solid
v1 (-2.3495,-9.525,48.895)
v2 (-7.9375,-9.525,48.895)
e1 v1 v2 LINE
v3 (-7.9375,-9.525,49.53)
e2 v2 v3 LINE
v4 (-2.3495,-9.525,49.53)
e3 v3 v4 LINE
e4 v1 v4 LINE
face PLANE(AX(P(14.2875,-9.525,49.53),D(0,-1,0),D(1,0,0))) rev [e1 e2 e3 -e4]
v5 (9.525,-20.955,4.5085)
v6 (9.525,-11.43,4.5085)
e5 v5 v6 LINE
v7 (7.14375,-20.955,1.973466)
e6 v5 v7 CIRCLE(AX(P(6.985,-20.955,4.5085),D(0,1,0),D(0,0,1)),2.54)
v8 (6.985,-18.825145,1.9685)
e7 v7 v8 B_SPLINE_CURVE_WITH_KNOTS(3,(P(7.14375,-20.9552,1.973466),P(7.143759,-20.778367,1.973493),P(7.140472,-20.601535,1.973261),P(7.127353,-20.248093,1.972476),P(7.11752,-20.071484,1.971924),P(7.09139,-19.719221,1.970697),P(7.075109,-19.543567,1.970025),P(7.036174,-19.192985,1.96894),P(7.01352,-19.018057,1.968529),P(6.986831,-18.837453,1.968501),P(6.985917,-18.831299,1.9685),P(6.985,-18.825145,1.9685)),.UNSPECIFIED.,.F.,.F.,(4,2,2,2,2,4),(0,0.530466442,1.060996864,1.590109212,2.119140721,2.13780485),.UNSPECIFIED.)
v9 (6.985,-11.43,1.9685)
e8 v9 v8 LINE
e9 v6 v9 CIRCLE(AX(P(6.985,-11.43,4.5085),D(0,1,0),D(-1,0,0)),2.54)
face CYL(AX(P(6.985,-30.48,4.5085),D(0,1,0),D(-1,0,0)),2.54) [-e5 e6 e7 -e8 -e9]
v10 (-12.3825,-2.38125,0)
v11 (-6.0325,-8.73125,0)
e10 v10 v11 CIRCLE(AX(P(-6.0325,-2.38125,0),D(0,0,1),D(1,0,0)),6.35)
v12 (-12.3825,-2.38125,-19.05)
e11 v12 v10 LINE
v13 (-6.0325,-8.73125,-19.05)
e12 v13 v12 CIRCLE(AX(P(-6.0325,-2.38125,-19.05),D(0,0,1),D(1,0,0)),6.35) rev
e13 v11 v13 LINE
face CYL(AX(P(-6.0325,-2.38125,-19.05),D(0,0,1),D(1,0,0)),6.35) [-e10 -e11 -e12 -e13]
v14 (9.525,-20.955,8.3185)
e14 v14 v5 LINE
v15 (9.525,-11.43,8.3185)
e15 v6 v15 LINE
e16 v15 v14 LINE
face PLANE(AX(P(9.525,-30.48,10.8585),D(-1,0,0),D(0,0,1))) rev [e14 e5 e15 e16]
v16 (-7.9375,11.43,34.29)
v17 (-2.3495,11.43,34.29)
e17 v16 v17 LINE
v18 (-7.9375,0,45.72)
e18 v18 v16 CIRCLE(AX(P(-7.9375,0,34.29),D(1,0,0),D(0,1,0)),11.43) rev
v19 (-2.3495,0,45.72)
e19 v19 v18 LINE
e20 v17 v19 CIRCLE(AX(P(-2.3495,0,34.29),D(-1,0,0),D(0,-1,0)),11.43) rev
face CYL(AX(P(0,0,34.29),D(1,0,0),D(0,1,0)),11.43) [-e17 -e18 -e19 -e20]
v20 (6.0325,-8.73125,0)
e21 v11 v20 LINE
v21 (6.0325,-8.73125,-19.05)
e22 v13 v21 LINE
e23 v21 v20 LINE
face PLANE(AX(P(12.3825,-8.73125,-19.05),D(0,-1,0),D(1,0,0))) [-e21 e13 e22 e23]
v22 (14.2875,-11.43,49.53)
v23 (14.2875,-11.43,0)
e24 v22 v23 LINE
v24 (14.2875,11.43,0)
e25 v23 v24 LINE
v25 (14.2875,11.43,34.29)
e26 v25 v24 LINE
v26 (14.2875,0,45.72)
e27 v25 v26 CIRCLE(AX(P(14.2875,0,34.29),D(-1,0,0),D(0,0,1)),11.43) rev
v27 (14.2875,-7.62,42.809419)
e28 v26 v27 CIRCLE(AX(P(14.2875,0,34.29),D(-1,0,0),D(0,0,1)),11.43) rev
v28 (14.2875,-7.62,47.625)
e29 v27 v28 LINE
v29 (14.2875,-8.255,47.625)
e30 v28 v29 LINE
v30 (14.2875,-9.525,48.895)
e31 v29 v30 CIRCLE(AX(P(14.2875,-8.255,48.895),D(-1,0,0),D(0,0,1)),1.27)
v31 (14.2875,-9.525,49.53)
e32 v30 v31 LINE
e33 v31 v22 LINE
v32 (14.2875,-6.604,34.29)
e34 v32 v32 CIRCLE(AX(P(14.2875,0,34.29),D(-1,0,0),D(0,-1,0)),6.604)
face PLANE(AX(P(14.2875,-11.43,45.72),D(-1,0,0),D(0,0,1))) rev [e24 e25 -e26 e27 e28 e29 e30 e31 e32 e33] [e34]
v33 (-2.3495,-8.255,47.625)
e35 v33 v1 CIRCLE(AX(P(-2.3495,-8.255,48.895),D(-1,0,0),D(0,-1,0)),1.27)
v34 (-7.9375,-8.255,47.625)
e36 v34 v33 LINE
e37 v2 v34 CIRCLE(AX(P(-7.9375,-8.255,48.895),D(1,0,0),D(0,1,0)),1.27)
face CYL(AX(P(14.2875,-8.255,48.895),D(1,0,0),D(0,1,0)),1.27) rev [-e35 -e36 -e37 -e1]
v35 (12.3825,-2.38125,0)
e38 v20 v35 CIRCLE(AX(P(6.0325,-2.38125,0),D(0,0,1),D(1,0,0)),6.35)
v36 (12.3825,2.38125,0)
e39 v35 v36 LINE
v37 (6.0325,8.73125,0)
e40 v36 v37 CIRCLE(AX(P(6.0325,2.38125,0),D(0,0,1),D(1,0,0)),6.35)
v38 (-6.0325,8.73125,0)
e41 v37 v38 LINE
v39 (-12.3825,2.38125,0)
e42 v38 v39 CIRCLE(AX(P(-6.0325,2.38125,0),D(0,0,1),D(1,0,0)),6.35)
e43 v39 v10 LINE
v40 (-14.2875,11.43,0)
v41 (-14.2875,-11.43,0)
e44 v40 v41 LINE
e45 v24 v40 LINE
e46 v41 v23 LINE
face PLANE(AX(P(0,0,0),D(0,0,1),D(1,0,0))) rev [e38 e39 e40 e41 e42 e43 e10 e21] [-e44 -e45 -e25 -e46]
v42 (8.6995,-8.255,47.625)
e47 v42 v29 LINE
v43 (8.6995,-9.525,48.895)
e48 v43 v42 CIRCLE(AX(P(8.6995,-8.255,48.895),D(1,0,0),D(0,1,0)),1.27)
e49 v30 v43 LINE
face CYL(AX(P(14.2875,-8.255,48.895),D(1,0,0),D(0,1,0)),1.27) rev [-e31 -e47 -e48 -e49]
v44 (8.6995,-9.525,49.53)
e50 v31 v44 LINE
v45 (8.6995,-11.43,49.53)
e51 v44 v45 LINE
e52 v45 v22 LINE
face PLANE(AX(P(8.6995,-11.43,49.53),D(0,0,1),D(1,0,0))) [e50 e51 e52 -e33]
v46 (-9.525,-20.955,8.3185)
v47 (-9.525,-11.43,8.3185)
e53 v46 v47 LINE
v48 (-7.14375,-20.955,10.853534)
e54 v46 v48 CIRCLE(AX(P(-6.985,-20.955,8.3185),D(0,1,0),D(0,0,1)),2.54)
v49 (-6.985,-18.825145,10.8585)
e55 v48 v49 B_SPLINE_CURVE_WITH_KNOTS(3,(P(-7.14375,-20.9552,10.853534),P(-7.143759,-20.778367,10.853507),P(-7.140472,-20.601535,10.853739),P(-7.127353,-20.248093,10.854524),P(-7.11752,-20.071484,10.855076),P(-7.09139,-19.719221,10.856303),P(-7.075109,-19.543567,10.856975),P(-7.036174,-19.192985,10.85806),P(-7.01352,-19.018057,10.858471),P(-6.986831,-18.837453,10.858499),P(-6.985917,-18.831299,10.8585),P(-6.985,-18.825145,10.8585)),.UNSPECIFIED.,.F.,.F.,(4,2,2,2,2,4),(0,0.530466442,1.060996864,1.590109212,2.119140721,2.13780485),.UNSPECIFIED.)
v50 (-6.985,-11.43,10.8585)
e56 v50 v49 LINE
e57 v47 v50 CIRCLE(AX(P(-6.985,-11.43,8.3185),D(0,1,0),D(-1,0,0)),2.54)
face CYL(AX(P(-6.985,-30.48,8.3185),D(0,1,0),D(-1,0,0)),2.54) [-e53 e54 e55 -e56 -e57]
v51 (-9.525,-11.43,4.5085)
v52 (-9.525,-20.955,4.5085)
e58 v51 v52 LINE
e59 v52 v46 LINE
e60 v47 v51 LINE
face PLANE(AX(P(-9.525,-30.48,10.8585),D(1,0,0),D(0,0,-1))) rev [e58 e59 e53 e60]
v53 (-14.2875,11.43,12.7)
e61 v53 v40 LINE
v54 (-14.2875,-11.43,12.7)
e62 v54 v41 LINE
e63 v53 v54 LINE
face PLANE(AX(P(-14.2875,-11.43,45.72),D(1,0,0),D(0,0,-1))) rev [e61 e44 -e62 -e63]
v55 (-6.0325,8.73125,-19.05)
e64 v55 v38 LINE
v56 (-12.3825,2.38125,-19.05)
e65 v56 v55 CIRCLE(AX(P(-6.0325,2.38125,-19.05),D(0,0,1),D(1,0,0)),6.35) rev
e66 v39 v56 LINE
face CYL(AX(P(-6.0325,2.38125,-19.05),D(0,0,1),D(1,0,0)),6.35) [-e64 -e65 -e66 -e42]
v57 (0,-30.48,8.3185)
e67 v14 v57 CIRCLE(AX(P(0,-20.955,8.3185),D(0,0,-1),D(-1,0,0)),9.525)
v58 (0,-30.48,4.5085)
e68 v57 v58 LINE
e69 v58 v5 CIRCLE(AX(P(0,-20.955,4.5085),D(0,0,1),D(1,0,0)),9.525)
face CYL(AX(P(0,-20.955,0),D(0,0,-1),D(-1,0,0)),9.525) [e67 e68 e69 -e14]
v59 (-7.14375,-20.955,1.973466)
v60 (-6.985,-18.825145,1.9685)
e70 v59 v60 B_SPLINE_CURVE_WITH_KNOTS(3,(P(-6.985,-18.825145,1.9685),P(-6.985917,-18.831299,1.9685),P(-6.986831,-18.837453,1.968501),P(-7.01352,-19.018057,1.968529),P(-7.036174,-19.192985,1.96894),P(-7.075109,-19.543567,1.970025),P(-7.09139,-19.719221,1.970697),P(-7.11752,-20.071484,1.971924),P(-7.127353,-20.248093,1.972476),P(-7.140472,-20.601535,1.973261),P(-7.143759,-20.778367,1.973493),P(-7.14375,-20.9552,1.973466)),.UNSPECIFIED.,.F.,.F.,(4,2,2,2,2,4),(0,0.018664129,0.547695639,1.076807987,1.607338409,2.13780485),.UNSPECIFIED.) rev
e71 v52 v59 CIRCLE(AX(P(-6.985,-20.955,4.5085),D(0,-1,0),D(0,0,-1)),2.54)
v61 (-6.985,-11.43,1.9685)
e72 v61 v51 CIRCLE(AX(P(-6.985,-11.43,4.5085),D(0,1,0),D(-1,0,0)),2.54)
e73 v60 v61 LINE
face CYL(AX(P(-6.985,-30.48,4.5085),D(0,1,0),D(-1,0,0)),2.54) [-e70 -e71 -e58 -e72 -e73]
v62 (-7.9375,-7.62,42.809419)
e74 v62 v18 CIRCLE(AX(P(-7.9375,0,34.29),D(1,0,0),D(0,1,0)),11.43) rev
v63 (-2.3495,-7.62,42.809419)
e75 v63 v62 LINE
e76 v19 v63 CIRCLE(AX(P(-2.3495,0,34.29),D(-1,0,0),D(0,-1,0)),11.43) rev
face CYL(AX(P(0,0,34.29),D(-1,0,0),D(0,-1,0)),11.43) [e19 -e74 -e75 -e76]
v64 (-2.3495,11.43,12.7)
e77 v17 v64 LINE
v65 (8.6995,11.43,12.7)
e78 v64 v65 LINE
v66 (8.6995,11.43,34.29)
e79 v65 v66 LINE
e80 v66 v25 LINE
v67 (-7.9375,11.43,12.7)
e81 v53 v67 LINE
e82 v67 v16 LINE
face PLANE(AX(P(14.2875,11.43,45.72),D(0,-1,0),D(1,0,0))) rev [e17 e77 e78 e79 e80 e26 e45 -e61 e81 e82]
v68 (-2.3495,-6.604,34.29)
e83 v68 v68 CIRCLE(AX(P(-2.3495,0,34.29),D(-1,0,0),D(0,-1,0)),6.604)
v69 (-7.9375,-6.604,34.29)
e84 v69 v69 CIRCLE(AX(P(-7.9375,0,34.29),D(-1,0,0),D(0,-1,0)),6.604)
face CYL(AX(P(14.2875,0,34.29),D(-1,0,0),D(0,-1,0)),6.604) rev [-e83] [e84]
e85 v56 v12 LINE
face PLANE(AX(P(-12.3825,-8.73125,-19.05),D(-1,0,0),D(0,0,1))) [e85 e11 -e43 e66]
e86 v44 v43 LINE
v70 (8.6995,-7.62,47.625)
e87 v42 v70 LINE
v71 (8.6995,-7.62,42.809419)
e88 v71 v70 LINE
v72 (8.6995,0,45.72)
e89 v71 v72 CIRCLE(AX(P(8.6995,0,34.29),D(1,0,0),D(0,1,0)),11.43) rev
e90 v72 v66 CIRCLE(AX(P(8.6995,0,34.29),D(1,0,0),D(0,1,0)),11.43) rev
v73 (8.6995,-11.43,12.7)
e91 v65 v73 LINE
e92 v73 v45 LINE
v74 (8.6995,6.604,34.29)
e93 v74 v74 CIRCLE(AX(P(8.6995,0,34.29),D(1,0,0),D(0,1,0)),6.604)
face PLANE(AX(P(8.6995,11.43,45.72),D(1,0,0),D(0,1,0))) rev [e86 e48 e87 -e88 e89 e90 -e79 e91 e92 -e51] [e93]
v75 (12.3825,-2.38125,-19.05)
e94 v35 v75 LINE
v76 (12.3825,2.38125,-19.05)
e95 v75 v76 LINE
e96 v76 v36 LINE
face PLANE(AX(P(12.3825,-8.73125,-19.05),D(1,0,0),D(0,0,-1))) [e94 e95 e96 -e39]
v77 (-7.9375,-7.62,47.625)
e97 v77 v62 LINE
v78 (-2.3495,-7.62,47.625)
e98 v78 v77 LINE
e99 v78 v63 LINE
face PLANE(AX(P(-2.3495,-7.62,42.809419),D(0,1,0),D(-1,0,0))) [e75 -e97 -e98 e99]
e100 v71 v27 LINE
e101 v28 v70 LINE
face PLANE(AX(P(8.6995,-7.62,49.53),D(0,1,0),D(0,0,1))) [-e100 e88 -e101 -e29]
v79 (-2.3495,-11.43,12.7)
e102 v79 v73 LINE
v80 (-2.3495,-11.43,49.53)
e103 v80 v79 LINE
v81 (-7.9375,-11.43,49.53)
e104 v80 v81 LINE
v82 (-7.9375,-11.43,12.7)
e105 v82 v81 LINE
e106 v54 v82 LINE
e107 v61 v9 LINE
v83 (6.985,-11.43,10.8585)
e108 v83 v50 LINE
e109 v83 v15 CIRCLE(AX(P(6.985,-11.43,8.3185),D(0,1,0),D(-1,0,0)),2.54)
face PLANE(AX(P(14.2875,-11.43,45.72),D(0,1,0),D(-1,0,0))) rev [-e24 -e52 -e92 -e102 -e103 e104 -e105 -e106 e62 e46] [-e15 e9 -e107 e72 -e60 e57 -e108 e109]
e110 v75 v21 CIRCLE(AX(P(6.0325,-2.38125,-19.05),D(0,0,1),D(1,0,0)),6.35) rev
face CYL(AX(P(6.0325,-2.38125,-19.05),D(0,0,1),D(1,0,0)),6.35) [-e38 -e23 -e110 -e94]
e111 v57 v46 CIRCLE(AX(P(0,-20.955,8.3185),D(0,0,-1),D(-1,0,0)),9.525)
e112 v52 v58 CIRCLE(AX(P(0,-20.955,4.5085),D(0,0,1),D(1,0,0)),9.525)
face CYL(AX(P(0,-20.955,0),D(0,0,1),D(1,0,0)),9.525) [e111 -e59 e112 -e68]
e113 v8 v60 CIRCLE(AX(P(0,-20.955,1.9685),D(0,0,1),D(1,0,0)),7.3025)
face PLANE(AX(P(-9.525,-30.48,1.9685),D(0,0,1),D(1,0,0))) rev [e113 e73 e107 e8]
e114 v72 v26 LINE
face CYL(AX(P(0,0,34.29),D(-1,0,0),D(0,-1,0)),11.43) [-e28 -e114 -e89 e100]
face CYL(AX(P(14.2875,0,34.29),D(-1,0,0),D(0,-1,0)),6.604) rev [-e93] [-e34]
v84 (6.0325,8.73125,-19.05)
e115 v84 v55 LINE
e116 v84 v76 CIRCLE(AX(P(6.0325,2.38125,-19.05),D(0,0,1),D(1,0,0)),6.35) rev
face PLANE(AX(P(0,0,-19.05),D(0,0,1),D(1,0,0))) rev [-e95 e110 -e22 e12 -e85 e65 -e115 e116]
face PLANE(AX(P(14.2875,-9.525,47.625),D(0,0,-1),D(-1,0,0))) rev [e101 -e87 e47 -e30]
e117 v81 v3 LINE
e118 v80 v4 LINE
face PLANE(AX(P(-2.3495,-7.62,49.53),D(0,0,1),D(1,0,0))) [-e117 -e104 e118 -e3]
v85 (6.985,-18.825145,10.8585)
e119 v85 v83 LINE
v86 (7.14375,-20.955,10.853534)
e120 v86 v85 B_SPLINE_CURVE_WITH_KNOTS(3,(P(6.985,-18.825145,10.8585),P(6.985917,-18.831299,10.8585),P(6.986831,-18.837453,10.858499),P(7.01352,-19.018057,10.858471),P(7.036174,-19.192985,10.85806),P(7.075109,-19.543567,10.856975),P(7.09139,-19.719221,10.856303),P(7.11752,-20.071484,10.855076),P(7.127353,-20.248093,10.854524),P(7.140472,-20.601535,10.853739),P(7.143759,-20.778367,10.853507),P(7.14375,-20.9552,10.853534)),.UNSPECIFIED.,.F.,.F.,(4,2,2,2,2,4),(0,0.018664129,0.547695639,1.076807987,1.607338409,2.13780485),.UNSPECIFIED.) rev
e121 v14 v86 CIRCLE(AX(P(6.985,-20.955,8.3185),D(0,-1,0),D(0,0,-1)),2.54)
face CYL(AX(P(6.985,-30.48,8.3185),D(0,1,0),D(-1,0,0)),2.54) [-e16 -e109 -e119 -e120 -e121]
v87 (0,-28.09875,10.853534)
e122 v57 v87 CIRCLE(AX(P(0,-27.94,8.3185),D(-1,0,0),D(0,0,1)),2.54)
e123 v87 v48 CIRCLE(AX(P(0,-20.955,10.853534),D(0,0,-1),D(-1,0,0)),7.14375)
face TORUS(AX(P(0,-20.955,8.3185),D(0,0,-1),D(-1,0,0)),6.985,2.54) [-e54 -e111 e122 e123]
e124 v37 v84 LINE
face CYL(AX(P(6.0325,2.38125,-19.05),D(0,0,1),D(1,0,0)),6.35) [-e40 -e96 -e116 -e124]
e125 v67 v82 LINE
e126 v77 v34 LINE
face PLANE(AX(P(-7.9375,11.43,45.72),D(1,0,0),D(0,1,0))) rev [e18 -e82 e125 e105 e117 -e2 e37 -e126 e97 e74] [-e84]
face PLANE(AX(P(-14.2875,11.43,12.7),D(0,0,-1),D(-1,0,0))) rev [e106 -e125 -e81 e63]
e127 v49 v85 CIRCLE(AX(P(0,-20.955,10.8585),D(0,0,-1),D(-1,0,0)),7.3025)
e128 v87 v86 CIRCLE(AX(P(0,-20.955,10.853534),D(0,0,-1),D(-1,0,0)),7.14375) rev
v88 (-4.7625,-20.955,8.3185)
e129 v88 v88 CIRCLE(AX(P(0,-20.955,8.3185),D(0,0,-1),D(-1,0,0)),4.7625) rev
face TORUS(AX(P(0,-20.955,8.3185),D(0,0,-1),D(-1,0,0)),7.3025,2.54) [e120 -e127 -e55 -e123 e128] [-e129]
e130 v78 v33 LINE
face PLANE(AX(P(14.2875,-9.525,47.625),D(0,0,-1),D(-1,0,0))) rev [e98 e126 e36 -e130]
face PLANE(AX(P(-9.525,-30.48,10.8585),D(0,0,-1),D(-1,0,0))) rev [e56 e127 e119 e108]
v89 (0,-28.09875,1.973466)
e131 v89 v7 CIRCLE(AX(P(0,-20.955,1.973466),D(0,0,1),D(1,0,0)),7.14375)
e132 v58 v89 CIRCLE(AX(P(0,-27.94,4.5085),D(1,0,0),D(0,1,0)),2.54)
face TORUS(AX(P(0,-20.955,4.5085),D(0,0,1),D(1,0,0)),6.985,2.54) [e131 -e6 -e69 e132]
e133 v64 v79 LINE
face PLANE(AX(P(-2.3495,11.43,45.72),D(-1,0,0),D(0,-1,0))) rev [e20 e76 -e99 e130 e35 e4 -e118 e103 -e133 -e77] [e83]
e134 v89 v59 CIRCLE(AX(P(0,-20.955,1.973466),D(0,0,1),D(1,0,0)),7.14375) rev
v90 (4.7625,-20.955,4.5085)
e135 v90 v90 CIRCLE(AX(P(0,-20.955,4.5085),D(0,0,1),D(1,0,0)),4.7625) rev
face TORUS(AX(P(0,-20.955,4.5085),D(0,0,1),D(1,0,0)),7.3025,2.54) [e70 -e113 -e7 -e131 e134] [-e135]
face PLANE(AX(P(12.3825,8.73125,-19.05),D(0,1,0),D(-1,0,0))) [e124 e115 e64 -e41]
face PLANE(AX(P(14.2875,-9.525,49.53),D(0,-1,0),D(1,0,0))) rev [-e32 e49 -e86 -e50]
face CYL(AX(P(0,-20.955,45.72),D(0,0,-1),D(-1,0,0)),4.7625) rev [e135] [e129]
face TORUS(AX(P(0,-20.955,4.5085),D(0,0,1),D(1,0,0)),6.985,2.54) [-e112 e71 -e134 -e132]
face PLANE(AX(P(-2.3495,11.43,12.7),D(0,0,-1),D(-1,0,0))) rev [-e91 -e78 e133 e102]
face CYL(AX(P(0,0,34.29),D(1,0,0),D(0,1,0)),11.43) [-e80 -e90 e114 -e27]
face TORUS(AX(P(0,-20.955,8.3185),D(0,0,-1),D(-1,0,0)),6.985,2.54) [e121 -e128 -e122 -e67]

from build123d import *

# Parameters (mm, degrees)
SKETCH2_W           = 24.765
SKETCH2_H           = 17.4625
BOSS_EXTRUDE1_DEPTH = 19.05
SKETCH3_W           = 28.575
SKETCH3_H           = 22.86
BOSS_EXTRUDE2_DEPTH = 45.72
SKETCH4_W           = 6.35
SKETCH4_H           = 33.02
SKETCH4_W_2         = 11.049
CUT_EXTRUDE1_DEPTH  = 54.075706837
SKETCH5_W           = 19.05
SKETCH5_H           = 8.89
BOSS_EXTRUDE3_DEPTH = 19.05
FILLET1_R           = 9.525
SKETCH6_R           = 4.7625
CUT_EXTRUDE2_DEPTH  = 56.202869568
FILLET5_R           = 11.43
SKETCH7_R           = 6.604
CUT_EXTRUDE3_DEPTH  = 60.273091914
FILLET2_R           = 2.54
FILLET3_R           = 6.35
BOSS_EXTRUDE5_DEPTH = 5.588
BOSS_EXTRUDE6_DEPTH = 5.588
SKETCH17_W          = 1.905
SKETCH17_H          = 1.905
CUT_EXTRUDE9_DEPTH  = 63.259151384
FILLET6_R           = 1.27


# Some blends are built 0.0001 mm under size
with BuildPart() as part:
    # Sketch2 → Boss-Extrude1 (new body)
    with BuildSketch(Plane.XY):
        Rectangle(SKETCH2_W, SKETCH2_H)
    extrude(amount=-BOSS_EXTRUDE1_DEPTH)

    # Sketch3 → Boss-Extrude2 (add)
    with BuildSketch(Plane.XY):
        Rectangle(SKETCH3_W, SKETCH3_H)
    extrude(amount=BOSS_EXTRUDE2_DEPTH)

    # Sketch4 → Cut-Extrude1 (cut, through all)
    with BuildSketch(Plane(origin=(0, -11.43, 0), x_dir=(-1, 0, 0), z_dir=(0, -1, 0))):
        with Locations((11.1125, -29.21)):
            Rectangle(SKETCH4_W, SKETCH4_H)
        with Locations((-3.175, -29.21)):
            Rectangle(SKETCH4_W_2, SKETCH4_H)
    extrude(amount=-CUT_EXTRUDE1_DEPTH, mode=Mode.SUBTRACT)

    # Sketch5 → Boss-Extrude3 (add)
    with BuildSketch(Plane.XZ.offset(11.43)):
        with Locations((0, 6.4135)):
            Rectangle(SKETCH5_W, SKETCH5_H)
    extrude(amount=BOSS_EXTRUDE3_DEPTH)

    # Fillet1
    fillet1_edges = [part.edges().sort_by_distance(p)[0] for p in [
        (9.525, -30.48, 6.4135),
        (-9.525, -30.48, 6.4135),
    ]]
    fillet(fillet1_edges, radius=FILLET1_R - 0.0001)  # a hair under: the kernel refuses the full size

    # Sketch6 → Cut-Extrude2 (cut, through all)
    with BuildSketch(Plane(origin=(0, 0, 1.9685), x_dir=(-1, 0, 0), z_dir=(0, 0, -1))):
        with Locations((0, -20.955)):
            Circle(SKETCH6_R)
    extrude(amount=-CUT_EXTRUDE2_DEPTH, mode=Mode.SUBTRACT)

    # Fillet5
    fillet5_edges = [part.edges().sort_by_distance(p)[0] for p in [
        (-5.1435, -11.43, 45.72),
        (-5.1435, 11.43, 45.72),
        (11.4935, 11.43, 45.72),
        (11.4935, -11.43, 45.72),
    ]]
    fillet(fillet5_edges, radius=FILLET5_R - 0.0001)  # a hair under: the kernel refuses the full size

    # Sketch7 → Cut-Extrude3 (cut, through all)
    with BuildSketch(Plane.ZY.offset(7.9375)):
        with Locations(Location((34.29, 0, 0), (0, 0, 270))):
            Circle(SKETCH7_R)
    extrude(amount=-CUT_EXTRUDE3_DEPTH, mode=Mode.SUBTRACT)

    # Fillet2
    # the kernel refuses this fillet: 2.54 mm, written as the material it takes off along each edge
    with BuildSketch(Plane(origin=(-9.525, -11.43, 10.8585), x_dir=(0, 0, -1), z_dir=(0, -1, 0))) as fillet2_piece_1:
        with BuildLine():
            CenterArc((FILLET2_R, FILLET2_R), FILLET2_R, 180, 90)
            Line((0, FILLET2_R), (0, 0))
            Line((0, 0), (FILLET2_R, 0))
        make_face()
    extrude(amount=9.5251, mode=Mode.SUBTRACT)
    with BuildSketch(Plane(origin=(9.525, -11.43, 10.8585), x_dir=(0, 0, -1), z_dir=(0, -1, 0)), Plane(origin=(9.525, -11.43, 1.9685), x_dir=(-1, 0, 0), z_dir=(0, -1, 0)), Plane(origin=(-9.525, -11.43, 1.9685), x_dir=(0, 0, 1), z_dir=(0, -1, 0))) as fillet2_piece_2:
        with BuildLine():
            CenterArc((FILLET2_R, -FILLET2_R), FILLET2_R, 90, 90)
            Line((0, -FILLET2_R), (0, 0))
            Line((0, 0), (FILLET2_R, 0))
        make_face()
    extrude(amount=9.5251, mode=Mode.SUBTRACT)
    with BuildSketch(Plane(origin=(-0.0001, -20.9551, 10.8585), x_dir=(-1, 0, 0), z_dir=(0, 1, 0))) as fillet2_piece_3:
        with BuildLine():
            CenterArc((9.5249 - FILLET2_R, -FILLET2_R), FILLET2_R, 360, 90)
            Line((9.5249, -FILLET2_R), (9.5249, 0))
            Line((9.5249, 0), (9.5249 - FILLET2_R, 0))
        make_face()
    revolve(axis=Axis((-0.0001, -20.9551, 10.8585), (0, 0, 1)), revolution_arc=90, mode=Mode.SUBTRACT)
    with BuildSketch(Plane(origin=(0.0001, -20.9551, 10.8585), x_dir=(1, 0, 0), z_dir=(0, 1, 0))) as fillet2_piece_4:
        with BuildLine():
            CenterArc((9.5249 - FILLET2_R, FILLET2_R), FILLET2_R, 270, 90)
            Line((9.5249, FILLET2_R), (9.5249, 0))
            Line((9.5249, 0), (9.5249 - FILLET2_R, 0))
        make_face()
    revolve(axis=Axis((0.0001, -20.9551, 10.8585), (0, 0, -1)), revolution_arc=90, mode=Mode.SUBTRACT)
    with BuildSketch(Plane(origin=(-0.0001, -20.9551, 1.9685), x_dir=(-1, 0, 0), z_dir=(0, 1, 0))) as fillet2_piece_5:
        with BuildLine():
            CenterArc((9.5249 - FILLET2_R, FILLET2_R), FILLET2_R, 270, 90)
            Line((9.5249, FILLET2_R), (9.5249, 0))
            Line((9.5249, 0), (9.5249 - FILLET2_R, 0))
        make_face()
    revolve(axis=Axis((-0.0001, -20.9551, 1.9685), (0, 0, 1)), revolution_arc=90, mode=Mode.SUBTRACT)
    with BuildSketch(Plane(origin=(0.0001, -20.9551, 1.9685), x_dir=(1, 0, 0), z_dir=(0, 1, 0))) as fillet2_piece_6:
        with BuildLine():
            CenterArc((9.5249 - FILLET2_R, -FILLET2_R), FILLET2_R, 0, 90)
            Line((9.5249, -FILLET2_R), (9.5249, 0))
            Line((9.5249, 0), (9.5249 - FILLET2_R, 0))
        make_face()
    revolve(axis=Axis((0.0001, -20.9551, 1.9685), (0, 0, -1)), revolution_arc=90, mode=Mode.SUBTRACT)
    with BuildSketch(Plane(origin=(0, -20.955, 10.8585), x_dir=(-1, 0, 0), z_dir=(0, -1, 0))) as fillet2_piece_7:
        with BuildLine():
            CenterArc((4.7625 + FILLET2_R, FILLET2_R), FILLET2_R, 180, 90)
            Line((4.7625, FILLET2_R), (4.7625, 0))
            Line((4.7625, 0), (4.7625 + FILLET2_R, 0))
        make_face()
    revolve(axis=Axis((0, -20.955, 10.8585), (0, 0, -1)), mode=Mode.SUBTRACT)
    with BuildSketch(Plane(origin=(0, -20.955, 1.9685), x_dir=(-1, 0, 0), z_dir=(0, -1, 0))) as fillet2_piece_8:
        with BuildLine():
            CenterArc((4.7625 + FILLET2_R, -FILLET2_R), FILLET2_R, 90, 90)
            Line((4.7625, -FILLET2_R), (4.7625, 0))
            Line((4.7625, 0), (4.7625 + FILLET2_R, 0))
        make_face()
    revolve(axis=Axis((0, -20.955, 1.9685), (0, 0, -1)), mode=Mode.SUBTRACT)
    with BuildSketch(Plane(origin=(0.0001, -30.48, 1.9685), x_dir=(0, 1, 0), z_dir=(-1, 0, 0)), Plane(origin=(-0.0001, -30.48, 10.8585), x_dir=(0, 1, 0), z_dir=(1, 0, 0))) as fillet2_piece_9:
        with BuildLine():
            CenterArc((FILLET2_R, -FILLET2_R), FILLET2_R, 90, 90)
            Line((0, -FILLET2_R), (0, 0))
            Line((0, 0), (FILLET2_R, 0))
        make_face()
    extrude(amount=0.0002, mode=Mode.SUBTRACT)

    # Fillet3
    fillet3_edges = [part.edges().sort_by_distance(p)[0] for p in [
        (-12.3825, 8.73125, -9.525),
        (12.3825, 8.73125, -9.525),
        (12.3825, -8.73125, -9.525),
        (-12.3825, -8.73125, -9.525),
    ]]
    fillet(fillet3_edges, radius=FILLET3_R)

    # Sketch14 → Boss-Extrude5 (add)
    with BuildSketch(Plane(origin=(14.2875, 0, 0), x_dir=(0, 0, -1), z_dir=(1, 0, 0))):
        Polygon((-34.29, -11.43), (-49.53, -11.43), (-49.53, -7.62), (-42.809418994, -7.62), align=None)
    extrude(amount=-BOSS_EXTRUDE5_DEPTH)

    # Sketch16 → Boss-Extrude6 (add)
    with BuildSketch(Plane.ZY.offset(7.9375)):
        Polygon((42.809418994, -7.62), (34.29, -11.43), (49.53, -11.43), (49.53, -7.62), align=None)
    extrude(amount=-BOSS_EXTRUDE6_DEPTH)

    # Sketch17 → Cut-Extrude9 (cut, through all)
    with BuildSketch(Plane.ZY.offset(7.9375)):
        with Locations((48.5775, -8.5725)):
            Rectangle(SKETCH17_W, SKETCH17_H)
    extrude(amount=-CUT_EXTRUDE9_DEPTH, mode=Mode.SUBTRACT)

    # Fillet6
    fillet6_edges = [part.edges().sort_by_distance(p)[0] for p in [
        (-5.1435, -9.525, 47.625),
        (11.4935, -9.525, 47.625),
    ]]
    fillet(fillet6_edges, radius=FILLET6_R)


solid = part.part
